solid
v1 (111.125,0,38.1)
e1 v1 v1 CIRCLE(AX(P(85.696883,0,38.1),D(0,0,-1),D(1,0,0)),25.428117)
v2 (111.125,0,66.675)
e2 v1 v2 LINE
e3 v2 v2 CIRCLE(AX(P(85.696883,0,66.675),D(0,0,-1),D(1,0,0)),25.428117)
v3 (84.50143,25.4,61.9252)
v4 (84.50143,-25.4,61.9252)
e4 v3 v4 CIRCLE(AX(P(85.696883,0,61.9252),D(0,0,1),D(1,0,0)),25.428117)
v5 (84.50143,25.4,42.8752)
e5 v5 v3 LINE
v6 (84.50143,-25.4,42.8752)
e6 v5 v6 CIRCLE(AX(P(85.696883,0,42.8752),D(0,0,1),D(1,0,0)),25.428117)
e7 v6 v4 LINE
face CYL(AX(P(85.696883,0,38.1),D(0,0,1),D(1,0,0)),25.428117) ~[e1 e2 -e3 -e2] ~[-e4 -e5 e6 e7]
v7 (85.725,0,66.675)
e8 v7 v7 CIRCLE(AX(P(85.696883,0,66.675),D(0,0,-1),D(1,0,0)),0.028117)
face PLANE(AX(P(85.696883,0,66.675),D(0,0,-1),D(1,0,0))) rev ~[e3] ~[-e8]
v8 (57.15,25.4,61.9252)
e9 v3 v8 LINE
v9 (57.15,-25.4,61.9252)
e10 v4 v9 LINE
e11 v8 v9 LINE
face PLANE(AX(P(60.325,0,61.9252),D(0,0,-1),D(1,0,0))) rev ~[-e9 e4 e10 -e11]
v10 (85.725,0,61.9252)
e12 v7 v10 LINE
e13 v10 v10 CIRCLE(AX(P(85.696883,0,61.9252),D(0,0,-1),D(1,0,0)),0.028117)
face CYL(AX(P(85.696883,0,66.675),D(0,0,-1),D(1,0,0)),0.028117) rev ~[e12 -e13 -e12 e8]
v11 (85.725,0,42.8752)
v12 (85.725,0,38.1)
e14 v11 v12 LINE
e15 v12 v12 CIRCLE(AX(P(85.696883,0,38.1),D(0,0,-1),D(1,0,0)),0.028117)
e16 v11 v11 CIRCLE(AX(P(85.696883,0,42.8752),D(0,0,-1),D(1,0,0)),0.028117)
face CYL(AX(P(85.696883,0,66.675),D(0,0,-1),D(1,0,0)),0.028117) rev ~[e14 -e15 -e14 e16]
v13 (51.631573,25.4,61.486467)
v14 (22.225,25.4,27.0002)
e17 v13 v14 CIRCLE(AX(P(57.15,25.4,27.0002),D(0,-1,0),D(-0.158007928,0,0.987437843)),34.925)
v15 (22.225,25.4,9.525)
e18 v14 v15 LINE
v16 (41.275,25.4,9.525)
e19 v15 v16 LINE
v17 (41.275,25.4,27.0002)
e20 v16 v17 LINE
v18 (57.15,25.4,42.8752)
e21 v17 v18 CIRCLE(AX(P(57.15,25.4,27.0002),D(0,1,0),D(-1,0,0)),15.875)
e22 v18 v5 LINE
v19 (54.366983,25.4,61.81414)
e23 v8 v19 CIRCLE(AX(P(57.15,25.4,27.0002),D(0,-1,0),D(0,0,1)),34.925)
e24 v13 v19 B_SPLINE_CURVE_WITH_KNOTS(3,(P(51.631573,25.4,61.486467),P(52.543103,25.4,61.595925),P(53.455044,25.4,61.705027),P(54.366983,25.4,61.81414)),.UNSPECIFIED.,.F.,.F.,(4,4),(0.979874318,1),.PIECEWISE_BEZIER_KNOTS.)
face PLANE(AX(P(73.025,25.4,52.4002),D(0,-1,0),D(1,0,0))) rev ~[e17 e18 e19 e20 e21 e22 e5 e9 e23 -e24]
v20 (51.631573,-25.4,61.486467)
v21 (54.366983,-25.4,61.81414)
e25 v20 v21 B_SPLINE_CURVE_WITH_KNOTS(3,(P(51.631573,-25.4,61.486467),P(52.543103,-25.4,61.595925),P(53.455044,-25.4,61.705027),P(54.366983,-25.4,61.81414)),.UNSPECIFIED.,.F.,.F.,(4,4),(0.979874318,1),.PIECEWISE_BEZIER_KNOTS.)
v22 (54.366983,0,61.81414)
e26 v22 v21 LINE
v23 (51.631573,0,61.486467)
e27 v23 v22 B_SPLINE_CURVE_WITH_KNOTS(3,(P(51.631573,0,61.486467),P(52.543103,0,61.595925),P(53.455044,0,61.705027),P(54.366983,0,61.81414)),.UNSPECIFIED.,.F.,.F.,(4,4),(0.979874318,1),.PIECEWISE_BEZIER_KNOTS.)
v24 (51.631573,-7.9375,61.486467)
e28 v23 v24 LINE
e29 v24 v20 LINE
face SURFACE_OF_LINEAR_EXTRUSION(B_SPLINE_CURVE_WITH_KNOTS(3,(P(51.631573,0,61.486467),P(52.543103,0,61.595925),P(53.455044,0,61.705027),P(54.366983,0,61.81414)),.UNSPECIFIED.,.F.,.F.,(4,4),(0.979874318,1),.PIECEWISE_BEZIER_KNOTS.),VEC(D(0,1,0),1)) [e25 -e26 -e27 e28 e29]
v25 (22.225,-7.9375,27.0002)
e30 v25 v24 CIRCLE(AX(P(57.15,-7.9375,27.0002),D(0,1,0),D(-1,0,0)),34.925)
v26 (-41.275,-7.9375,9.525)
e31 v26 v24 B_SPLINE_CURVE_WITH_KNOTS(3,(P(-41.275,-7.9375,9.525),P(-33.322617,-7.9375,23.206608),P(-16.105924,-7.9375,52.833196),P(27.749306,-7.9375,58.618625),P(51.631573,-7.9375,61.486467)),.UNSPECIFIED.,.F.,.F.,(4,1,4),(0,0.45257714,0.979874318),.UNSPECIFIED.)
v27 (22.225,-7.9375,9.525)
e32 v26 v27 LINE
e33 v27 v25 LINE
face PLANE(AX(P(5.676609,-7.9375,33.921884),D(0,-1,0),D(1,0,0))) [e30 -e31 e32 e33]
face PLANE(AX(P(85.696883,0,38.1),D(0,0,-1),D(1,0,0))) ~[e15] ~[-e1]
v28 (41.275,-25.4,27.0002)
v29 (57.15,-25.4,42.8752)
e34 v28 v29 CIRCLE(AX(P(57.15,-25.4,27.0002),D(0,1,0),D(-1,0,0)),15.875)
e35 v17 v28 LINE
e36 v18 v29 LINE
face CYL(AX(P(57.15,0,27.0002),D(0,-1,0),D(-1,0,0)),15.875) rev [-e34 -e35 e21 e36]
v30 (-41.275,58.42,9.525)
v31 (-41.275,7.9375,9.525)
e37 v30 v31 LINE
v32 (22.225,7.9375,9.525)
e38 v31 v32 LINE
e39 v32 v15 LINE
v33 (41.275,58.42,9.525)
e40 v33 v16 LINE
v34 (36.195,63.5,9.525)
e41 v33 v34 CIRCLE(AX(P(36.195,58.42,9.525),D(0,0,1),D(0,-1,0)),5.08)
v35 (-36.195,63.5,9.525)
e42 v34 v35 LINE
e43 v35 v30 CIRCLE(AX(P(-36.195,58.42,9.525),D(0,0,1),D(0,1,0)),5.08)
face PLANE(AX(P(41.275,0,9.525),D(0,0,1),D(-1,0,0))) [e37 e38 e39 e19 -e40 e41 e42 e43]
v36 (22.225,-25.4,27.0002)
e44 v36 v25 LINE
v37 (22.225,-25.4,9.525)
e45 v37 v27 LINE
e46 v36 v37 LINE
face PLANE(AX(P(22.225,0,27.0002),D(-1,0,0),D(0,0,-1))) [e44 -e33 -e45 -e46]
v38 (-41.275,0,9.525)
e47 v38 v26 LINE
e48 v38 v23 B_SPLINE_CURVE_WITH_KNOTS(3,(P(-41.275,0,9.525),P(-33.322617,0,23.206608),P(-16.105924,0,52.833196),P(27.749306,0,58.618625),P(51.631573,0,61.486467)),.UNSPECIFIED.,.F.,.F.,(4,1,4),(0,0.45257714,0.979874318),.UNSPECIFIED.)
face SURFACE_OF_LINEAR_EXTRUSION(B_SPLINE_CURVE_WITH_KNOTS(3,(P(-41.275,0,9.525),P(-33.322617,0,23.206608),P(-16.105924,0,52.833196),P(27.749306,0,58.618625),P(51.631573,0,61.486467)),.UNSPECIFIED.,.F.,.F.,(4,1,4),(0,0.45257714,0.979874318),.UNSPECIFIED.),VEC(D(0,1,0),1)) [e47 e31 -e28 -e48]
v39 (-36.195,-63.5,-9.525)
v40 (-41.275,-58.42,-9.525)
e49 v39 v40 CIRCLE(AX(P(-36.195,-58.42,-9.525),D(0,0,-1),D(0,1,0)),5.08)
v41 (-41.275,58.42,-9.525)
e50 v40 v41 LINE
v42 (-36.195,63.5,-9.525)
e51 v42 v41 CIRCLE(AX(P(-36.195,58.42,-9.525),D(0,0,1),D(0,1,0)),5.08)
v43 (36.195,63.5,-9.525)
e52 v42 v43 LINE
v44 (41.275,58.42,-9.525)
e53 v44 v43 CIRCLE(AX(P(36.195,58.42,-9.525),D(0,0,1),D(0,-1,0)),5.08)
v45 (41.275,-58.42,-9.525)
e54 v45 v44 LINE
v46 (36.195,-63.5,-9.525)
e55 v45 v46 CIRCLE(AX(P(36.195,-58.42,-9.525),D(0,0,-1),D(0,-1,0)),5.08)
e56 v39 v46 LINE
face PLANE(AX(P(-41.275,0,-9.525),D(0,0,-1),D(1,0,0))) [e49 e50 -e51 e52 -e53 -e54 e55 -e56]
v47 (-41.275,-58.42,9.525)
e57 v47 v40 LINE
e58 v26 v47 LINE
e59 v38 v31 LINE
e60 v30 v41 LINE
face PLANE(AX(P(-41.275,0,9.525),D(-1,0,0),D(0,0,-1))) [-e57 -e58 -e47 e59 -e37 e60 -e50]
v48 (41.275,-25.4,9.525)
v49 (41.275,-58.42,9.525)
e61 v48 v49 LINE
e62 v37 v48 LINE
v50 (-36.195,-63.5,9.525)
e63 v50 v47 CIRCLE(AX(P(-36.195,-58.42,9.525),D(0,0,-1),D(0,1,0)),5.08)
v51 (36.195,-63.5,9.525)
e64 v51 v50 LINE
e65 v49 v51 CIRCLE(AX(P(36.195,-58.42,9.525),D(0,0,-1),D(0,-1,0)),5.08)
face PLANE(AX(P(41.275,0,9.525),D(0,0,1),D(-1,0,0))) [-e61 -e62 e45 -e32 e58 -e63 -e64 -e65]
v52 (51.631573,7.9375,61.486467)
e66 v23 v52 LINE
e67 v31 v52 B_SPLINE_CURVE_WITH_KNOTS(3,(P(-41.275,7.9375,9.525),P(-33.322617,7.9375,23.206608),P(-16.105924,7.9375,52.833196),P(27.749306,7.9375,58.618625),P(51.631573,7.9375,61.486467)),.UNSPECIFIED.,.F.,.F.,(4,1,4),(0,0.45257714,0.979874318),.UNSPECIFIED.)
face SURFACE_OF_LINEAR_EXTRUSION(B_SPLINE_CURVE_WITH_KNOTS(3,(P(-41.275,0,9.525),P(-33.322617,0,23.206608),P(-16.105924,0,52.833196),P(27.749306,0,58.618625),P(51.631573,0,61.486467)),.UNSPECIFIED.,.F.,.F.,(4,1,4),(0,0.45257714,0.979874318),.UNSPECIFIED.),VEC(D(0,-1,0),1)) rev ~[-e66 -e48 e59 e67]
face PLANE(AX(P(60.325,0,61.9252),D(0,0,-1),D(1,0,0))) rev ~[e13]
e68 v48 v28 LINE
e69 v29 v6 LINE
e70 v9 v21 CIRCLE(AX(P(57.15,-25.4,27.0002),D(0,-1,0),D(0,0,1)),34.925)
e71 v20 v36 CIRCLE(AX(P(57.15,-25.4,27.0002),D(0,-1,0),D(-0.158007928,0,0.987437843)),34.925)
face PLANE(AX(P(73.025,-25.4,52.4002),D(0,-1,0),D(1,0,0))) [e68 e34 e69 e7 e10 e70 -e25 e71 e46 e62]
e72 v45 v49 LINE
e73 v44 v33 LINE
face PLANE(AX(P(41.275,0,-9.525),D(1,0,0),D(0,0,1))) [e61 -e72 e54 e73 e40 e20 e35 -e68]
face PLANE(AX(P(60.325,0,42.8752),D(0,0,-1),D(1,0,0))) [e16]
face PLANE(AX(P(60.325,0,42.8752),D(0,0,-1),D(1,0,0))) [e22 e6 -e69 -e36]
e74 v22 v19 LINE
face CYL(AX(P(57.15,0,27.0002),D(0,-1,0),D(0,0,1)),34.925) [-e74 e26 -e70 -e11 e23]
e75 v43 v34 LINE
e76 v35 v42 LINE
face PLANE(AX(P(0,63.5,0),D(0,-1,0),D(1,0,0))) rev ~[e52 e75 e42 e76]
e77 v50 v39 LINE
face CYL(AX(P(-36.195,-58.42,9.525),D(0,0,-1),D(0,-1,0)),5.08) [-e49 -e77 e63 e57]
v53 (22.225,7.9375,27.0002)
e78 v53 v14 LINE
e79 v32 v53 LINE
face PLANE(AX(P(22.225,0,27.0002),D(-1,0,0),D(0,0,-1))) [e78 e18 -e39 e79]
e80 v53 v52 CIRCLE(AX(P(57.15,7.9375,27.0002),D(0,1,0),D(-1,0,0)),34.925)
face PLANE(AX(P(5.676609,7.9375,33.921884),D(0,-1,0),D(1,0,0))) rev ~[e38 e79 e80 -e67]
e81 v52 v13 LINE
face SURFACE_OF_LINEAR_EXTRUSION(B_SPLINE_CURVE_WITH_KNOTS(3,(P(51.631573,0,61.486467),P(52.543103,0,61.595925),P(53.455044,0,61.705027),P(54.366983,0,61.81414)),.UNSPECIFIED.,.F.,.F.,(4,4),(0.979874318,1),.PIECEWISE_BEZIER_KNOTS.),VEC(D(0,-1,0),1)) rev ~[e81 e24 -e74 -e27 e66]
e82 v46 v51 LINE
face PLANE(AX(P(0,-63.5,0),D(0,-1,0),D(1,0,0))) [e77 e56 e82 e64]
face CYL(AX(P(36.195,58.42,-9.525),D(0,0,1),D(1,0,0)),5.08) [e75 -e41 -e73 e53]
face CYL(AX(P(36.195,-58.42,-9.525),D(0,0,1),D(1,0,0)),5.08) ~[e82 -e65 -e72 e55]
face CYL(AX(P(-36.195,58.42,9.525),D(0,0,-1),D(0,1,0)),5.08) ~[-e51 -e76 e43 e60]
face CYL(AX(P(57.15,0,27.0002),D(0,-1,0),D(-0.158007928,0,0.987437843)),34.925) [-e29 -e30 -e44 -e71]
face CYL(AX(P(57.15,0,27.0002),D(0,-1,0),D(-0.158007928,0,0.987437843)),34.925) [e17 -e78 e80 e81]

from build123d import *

# Parameters (mm, degrees)
F1_DEPTH = 63.5
F2_DEPTH = 25.4
F0_W     = 25.4
F0_H     = 19.05
F4_DEPTH = 25.4
F5_DEPTH = 7.9375
F7_R     = 5.08


# Not quite as in the source:
# - a feature names something its author has since deleted; it is built from what else it names


with BuildPart() as f1:
    # F0 (on Front) → F1 (new body, symmetric)
    with BuildSketch(Plane.XZ):
        Polygon((41.275, -9.525), (41.275, 9.525), (22.225, 9.525), (-41.275, 9.525), (-41.275, -9.525), align=None)
    extrude(amount=F1_DEPTH, both=True)

    # F0 (on Front) → F2 (join, symmetric)
    with BuildSketch(Plane.XZ):
        with BuildLine():
            Line((22.225, 9.525), (41.275, 9.525))
            Line((41.275, 9.525), (41.275, 27.0002))
            ThreePointArc((41.275, 27.0002), (45.9246798487, 38.2255201513), (57.15, 42.8752))
            Line((57.15, 42.8752), (60.325, 42.8752))
            Line((60.325, 42.8752), (60.325, 61.9252))
            Line((60.325, 61.9252), (57.15, 61.9252))
            ThreePointArc((57.15, 61.9252), (55.7573840511, 61.8974240417), (54.3669832056, 61.8141403475))
            add(Edge.make_bspline(
                [(51.6315731061, 61.4864666813), (52.5431025701, 61.5959254015), (53.4550436694, 61.7050265498), (54.3669832056, 61.8141403475)],
                knots=[0.9798743177, 0.9798743177, 0.9798743177, 0.9798743177, 1, 1, 1, 1], degree=3))
            ThreePointArc((51.6315731061, 61.4864666813), (30.5747607323, 49.6610094045), (22.225, 27.0002))
            Line((22.225, 27.0002), (22.225, 9.525))
        make_face()
    extrude(amount=F2_DEPTH, both=True)

    # F0 (on Front) → F4 (join, symmetric)
    with BuildSketch(Plane.XZ):
        with Locations((73.025, 52.4002)):
            Rectangle(F0_W, F0_H)
    extrude(amount=F4_DEPTH, both=True)

    # F0 (on Front) → F5 (join, symmetric)
    with BuildSketch(Plane.XZ):
        with BuildLine():
            Line((-41.275, 9.525), (22.225, 9.525))
            Line((22.225, 9.525), (22.225, 27.0002))
            ThreePointArc((22.225, 27.0002), (30.5747607323, 49.6610094045), (51.6315731061, 61.4864666813))
            add(Edge.make_bspline(
                [(-41.275, 9.525), (-33.3226171476, 23.2066083148), (-16.1059236769, 52.8331960278), (27.7493063598, 58.6186248213), (51.6315731061, 61.4864666813)],
                knots=[0, 0, 0, 0, 0.4525771396, 0.9798743177, 0.9798743177, 0.9798743177, 0.9798743177], degree=3))
        make_face()
    extrude(amount=F5_DEPTH, both=True)

    # F0 (on Front) → F6 (revolve)
    with BuildSketch(Plane.XZ):
        Polygon((85.725, 61.9252), (85.725, 42.8752), (85.725, 38.1), (111.125, 38.1), (111.125, 66.675), (85.725, 66.675), align=None)
    revolve(axis=Axis((85.6968834996, 0, 52.5015871972), (0, 0, -1)))

    # F7
    f7_edges = [f1.edges().sort_by_distance(p)[0] for p in [
        (41.275, -63.5, 0),
        (-41.275, -63.5, 0),
        (41.275, 63.5, 0),
        (-41.275, 63.5, 0),
    ]]
    fillet(f7_edges, radius=F7_R)


solid = f1.part
